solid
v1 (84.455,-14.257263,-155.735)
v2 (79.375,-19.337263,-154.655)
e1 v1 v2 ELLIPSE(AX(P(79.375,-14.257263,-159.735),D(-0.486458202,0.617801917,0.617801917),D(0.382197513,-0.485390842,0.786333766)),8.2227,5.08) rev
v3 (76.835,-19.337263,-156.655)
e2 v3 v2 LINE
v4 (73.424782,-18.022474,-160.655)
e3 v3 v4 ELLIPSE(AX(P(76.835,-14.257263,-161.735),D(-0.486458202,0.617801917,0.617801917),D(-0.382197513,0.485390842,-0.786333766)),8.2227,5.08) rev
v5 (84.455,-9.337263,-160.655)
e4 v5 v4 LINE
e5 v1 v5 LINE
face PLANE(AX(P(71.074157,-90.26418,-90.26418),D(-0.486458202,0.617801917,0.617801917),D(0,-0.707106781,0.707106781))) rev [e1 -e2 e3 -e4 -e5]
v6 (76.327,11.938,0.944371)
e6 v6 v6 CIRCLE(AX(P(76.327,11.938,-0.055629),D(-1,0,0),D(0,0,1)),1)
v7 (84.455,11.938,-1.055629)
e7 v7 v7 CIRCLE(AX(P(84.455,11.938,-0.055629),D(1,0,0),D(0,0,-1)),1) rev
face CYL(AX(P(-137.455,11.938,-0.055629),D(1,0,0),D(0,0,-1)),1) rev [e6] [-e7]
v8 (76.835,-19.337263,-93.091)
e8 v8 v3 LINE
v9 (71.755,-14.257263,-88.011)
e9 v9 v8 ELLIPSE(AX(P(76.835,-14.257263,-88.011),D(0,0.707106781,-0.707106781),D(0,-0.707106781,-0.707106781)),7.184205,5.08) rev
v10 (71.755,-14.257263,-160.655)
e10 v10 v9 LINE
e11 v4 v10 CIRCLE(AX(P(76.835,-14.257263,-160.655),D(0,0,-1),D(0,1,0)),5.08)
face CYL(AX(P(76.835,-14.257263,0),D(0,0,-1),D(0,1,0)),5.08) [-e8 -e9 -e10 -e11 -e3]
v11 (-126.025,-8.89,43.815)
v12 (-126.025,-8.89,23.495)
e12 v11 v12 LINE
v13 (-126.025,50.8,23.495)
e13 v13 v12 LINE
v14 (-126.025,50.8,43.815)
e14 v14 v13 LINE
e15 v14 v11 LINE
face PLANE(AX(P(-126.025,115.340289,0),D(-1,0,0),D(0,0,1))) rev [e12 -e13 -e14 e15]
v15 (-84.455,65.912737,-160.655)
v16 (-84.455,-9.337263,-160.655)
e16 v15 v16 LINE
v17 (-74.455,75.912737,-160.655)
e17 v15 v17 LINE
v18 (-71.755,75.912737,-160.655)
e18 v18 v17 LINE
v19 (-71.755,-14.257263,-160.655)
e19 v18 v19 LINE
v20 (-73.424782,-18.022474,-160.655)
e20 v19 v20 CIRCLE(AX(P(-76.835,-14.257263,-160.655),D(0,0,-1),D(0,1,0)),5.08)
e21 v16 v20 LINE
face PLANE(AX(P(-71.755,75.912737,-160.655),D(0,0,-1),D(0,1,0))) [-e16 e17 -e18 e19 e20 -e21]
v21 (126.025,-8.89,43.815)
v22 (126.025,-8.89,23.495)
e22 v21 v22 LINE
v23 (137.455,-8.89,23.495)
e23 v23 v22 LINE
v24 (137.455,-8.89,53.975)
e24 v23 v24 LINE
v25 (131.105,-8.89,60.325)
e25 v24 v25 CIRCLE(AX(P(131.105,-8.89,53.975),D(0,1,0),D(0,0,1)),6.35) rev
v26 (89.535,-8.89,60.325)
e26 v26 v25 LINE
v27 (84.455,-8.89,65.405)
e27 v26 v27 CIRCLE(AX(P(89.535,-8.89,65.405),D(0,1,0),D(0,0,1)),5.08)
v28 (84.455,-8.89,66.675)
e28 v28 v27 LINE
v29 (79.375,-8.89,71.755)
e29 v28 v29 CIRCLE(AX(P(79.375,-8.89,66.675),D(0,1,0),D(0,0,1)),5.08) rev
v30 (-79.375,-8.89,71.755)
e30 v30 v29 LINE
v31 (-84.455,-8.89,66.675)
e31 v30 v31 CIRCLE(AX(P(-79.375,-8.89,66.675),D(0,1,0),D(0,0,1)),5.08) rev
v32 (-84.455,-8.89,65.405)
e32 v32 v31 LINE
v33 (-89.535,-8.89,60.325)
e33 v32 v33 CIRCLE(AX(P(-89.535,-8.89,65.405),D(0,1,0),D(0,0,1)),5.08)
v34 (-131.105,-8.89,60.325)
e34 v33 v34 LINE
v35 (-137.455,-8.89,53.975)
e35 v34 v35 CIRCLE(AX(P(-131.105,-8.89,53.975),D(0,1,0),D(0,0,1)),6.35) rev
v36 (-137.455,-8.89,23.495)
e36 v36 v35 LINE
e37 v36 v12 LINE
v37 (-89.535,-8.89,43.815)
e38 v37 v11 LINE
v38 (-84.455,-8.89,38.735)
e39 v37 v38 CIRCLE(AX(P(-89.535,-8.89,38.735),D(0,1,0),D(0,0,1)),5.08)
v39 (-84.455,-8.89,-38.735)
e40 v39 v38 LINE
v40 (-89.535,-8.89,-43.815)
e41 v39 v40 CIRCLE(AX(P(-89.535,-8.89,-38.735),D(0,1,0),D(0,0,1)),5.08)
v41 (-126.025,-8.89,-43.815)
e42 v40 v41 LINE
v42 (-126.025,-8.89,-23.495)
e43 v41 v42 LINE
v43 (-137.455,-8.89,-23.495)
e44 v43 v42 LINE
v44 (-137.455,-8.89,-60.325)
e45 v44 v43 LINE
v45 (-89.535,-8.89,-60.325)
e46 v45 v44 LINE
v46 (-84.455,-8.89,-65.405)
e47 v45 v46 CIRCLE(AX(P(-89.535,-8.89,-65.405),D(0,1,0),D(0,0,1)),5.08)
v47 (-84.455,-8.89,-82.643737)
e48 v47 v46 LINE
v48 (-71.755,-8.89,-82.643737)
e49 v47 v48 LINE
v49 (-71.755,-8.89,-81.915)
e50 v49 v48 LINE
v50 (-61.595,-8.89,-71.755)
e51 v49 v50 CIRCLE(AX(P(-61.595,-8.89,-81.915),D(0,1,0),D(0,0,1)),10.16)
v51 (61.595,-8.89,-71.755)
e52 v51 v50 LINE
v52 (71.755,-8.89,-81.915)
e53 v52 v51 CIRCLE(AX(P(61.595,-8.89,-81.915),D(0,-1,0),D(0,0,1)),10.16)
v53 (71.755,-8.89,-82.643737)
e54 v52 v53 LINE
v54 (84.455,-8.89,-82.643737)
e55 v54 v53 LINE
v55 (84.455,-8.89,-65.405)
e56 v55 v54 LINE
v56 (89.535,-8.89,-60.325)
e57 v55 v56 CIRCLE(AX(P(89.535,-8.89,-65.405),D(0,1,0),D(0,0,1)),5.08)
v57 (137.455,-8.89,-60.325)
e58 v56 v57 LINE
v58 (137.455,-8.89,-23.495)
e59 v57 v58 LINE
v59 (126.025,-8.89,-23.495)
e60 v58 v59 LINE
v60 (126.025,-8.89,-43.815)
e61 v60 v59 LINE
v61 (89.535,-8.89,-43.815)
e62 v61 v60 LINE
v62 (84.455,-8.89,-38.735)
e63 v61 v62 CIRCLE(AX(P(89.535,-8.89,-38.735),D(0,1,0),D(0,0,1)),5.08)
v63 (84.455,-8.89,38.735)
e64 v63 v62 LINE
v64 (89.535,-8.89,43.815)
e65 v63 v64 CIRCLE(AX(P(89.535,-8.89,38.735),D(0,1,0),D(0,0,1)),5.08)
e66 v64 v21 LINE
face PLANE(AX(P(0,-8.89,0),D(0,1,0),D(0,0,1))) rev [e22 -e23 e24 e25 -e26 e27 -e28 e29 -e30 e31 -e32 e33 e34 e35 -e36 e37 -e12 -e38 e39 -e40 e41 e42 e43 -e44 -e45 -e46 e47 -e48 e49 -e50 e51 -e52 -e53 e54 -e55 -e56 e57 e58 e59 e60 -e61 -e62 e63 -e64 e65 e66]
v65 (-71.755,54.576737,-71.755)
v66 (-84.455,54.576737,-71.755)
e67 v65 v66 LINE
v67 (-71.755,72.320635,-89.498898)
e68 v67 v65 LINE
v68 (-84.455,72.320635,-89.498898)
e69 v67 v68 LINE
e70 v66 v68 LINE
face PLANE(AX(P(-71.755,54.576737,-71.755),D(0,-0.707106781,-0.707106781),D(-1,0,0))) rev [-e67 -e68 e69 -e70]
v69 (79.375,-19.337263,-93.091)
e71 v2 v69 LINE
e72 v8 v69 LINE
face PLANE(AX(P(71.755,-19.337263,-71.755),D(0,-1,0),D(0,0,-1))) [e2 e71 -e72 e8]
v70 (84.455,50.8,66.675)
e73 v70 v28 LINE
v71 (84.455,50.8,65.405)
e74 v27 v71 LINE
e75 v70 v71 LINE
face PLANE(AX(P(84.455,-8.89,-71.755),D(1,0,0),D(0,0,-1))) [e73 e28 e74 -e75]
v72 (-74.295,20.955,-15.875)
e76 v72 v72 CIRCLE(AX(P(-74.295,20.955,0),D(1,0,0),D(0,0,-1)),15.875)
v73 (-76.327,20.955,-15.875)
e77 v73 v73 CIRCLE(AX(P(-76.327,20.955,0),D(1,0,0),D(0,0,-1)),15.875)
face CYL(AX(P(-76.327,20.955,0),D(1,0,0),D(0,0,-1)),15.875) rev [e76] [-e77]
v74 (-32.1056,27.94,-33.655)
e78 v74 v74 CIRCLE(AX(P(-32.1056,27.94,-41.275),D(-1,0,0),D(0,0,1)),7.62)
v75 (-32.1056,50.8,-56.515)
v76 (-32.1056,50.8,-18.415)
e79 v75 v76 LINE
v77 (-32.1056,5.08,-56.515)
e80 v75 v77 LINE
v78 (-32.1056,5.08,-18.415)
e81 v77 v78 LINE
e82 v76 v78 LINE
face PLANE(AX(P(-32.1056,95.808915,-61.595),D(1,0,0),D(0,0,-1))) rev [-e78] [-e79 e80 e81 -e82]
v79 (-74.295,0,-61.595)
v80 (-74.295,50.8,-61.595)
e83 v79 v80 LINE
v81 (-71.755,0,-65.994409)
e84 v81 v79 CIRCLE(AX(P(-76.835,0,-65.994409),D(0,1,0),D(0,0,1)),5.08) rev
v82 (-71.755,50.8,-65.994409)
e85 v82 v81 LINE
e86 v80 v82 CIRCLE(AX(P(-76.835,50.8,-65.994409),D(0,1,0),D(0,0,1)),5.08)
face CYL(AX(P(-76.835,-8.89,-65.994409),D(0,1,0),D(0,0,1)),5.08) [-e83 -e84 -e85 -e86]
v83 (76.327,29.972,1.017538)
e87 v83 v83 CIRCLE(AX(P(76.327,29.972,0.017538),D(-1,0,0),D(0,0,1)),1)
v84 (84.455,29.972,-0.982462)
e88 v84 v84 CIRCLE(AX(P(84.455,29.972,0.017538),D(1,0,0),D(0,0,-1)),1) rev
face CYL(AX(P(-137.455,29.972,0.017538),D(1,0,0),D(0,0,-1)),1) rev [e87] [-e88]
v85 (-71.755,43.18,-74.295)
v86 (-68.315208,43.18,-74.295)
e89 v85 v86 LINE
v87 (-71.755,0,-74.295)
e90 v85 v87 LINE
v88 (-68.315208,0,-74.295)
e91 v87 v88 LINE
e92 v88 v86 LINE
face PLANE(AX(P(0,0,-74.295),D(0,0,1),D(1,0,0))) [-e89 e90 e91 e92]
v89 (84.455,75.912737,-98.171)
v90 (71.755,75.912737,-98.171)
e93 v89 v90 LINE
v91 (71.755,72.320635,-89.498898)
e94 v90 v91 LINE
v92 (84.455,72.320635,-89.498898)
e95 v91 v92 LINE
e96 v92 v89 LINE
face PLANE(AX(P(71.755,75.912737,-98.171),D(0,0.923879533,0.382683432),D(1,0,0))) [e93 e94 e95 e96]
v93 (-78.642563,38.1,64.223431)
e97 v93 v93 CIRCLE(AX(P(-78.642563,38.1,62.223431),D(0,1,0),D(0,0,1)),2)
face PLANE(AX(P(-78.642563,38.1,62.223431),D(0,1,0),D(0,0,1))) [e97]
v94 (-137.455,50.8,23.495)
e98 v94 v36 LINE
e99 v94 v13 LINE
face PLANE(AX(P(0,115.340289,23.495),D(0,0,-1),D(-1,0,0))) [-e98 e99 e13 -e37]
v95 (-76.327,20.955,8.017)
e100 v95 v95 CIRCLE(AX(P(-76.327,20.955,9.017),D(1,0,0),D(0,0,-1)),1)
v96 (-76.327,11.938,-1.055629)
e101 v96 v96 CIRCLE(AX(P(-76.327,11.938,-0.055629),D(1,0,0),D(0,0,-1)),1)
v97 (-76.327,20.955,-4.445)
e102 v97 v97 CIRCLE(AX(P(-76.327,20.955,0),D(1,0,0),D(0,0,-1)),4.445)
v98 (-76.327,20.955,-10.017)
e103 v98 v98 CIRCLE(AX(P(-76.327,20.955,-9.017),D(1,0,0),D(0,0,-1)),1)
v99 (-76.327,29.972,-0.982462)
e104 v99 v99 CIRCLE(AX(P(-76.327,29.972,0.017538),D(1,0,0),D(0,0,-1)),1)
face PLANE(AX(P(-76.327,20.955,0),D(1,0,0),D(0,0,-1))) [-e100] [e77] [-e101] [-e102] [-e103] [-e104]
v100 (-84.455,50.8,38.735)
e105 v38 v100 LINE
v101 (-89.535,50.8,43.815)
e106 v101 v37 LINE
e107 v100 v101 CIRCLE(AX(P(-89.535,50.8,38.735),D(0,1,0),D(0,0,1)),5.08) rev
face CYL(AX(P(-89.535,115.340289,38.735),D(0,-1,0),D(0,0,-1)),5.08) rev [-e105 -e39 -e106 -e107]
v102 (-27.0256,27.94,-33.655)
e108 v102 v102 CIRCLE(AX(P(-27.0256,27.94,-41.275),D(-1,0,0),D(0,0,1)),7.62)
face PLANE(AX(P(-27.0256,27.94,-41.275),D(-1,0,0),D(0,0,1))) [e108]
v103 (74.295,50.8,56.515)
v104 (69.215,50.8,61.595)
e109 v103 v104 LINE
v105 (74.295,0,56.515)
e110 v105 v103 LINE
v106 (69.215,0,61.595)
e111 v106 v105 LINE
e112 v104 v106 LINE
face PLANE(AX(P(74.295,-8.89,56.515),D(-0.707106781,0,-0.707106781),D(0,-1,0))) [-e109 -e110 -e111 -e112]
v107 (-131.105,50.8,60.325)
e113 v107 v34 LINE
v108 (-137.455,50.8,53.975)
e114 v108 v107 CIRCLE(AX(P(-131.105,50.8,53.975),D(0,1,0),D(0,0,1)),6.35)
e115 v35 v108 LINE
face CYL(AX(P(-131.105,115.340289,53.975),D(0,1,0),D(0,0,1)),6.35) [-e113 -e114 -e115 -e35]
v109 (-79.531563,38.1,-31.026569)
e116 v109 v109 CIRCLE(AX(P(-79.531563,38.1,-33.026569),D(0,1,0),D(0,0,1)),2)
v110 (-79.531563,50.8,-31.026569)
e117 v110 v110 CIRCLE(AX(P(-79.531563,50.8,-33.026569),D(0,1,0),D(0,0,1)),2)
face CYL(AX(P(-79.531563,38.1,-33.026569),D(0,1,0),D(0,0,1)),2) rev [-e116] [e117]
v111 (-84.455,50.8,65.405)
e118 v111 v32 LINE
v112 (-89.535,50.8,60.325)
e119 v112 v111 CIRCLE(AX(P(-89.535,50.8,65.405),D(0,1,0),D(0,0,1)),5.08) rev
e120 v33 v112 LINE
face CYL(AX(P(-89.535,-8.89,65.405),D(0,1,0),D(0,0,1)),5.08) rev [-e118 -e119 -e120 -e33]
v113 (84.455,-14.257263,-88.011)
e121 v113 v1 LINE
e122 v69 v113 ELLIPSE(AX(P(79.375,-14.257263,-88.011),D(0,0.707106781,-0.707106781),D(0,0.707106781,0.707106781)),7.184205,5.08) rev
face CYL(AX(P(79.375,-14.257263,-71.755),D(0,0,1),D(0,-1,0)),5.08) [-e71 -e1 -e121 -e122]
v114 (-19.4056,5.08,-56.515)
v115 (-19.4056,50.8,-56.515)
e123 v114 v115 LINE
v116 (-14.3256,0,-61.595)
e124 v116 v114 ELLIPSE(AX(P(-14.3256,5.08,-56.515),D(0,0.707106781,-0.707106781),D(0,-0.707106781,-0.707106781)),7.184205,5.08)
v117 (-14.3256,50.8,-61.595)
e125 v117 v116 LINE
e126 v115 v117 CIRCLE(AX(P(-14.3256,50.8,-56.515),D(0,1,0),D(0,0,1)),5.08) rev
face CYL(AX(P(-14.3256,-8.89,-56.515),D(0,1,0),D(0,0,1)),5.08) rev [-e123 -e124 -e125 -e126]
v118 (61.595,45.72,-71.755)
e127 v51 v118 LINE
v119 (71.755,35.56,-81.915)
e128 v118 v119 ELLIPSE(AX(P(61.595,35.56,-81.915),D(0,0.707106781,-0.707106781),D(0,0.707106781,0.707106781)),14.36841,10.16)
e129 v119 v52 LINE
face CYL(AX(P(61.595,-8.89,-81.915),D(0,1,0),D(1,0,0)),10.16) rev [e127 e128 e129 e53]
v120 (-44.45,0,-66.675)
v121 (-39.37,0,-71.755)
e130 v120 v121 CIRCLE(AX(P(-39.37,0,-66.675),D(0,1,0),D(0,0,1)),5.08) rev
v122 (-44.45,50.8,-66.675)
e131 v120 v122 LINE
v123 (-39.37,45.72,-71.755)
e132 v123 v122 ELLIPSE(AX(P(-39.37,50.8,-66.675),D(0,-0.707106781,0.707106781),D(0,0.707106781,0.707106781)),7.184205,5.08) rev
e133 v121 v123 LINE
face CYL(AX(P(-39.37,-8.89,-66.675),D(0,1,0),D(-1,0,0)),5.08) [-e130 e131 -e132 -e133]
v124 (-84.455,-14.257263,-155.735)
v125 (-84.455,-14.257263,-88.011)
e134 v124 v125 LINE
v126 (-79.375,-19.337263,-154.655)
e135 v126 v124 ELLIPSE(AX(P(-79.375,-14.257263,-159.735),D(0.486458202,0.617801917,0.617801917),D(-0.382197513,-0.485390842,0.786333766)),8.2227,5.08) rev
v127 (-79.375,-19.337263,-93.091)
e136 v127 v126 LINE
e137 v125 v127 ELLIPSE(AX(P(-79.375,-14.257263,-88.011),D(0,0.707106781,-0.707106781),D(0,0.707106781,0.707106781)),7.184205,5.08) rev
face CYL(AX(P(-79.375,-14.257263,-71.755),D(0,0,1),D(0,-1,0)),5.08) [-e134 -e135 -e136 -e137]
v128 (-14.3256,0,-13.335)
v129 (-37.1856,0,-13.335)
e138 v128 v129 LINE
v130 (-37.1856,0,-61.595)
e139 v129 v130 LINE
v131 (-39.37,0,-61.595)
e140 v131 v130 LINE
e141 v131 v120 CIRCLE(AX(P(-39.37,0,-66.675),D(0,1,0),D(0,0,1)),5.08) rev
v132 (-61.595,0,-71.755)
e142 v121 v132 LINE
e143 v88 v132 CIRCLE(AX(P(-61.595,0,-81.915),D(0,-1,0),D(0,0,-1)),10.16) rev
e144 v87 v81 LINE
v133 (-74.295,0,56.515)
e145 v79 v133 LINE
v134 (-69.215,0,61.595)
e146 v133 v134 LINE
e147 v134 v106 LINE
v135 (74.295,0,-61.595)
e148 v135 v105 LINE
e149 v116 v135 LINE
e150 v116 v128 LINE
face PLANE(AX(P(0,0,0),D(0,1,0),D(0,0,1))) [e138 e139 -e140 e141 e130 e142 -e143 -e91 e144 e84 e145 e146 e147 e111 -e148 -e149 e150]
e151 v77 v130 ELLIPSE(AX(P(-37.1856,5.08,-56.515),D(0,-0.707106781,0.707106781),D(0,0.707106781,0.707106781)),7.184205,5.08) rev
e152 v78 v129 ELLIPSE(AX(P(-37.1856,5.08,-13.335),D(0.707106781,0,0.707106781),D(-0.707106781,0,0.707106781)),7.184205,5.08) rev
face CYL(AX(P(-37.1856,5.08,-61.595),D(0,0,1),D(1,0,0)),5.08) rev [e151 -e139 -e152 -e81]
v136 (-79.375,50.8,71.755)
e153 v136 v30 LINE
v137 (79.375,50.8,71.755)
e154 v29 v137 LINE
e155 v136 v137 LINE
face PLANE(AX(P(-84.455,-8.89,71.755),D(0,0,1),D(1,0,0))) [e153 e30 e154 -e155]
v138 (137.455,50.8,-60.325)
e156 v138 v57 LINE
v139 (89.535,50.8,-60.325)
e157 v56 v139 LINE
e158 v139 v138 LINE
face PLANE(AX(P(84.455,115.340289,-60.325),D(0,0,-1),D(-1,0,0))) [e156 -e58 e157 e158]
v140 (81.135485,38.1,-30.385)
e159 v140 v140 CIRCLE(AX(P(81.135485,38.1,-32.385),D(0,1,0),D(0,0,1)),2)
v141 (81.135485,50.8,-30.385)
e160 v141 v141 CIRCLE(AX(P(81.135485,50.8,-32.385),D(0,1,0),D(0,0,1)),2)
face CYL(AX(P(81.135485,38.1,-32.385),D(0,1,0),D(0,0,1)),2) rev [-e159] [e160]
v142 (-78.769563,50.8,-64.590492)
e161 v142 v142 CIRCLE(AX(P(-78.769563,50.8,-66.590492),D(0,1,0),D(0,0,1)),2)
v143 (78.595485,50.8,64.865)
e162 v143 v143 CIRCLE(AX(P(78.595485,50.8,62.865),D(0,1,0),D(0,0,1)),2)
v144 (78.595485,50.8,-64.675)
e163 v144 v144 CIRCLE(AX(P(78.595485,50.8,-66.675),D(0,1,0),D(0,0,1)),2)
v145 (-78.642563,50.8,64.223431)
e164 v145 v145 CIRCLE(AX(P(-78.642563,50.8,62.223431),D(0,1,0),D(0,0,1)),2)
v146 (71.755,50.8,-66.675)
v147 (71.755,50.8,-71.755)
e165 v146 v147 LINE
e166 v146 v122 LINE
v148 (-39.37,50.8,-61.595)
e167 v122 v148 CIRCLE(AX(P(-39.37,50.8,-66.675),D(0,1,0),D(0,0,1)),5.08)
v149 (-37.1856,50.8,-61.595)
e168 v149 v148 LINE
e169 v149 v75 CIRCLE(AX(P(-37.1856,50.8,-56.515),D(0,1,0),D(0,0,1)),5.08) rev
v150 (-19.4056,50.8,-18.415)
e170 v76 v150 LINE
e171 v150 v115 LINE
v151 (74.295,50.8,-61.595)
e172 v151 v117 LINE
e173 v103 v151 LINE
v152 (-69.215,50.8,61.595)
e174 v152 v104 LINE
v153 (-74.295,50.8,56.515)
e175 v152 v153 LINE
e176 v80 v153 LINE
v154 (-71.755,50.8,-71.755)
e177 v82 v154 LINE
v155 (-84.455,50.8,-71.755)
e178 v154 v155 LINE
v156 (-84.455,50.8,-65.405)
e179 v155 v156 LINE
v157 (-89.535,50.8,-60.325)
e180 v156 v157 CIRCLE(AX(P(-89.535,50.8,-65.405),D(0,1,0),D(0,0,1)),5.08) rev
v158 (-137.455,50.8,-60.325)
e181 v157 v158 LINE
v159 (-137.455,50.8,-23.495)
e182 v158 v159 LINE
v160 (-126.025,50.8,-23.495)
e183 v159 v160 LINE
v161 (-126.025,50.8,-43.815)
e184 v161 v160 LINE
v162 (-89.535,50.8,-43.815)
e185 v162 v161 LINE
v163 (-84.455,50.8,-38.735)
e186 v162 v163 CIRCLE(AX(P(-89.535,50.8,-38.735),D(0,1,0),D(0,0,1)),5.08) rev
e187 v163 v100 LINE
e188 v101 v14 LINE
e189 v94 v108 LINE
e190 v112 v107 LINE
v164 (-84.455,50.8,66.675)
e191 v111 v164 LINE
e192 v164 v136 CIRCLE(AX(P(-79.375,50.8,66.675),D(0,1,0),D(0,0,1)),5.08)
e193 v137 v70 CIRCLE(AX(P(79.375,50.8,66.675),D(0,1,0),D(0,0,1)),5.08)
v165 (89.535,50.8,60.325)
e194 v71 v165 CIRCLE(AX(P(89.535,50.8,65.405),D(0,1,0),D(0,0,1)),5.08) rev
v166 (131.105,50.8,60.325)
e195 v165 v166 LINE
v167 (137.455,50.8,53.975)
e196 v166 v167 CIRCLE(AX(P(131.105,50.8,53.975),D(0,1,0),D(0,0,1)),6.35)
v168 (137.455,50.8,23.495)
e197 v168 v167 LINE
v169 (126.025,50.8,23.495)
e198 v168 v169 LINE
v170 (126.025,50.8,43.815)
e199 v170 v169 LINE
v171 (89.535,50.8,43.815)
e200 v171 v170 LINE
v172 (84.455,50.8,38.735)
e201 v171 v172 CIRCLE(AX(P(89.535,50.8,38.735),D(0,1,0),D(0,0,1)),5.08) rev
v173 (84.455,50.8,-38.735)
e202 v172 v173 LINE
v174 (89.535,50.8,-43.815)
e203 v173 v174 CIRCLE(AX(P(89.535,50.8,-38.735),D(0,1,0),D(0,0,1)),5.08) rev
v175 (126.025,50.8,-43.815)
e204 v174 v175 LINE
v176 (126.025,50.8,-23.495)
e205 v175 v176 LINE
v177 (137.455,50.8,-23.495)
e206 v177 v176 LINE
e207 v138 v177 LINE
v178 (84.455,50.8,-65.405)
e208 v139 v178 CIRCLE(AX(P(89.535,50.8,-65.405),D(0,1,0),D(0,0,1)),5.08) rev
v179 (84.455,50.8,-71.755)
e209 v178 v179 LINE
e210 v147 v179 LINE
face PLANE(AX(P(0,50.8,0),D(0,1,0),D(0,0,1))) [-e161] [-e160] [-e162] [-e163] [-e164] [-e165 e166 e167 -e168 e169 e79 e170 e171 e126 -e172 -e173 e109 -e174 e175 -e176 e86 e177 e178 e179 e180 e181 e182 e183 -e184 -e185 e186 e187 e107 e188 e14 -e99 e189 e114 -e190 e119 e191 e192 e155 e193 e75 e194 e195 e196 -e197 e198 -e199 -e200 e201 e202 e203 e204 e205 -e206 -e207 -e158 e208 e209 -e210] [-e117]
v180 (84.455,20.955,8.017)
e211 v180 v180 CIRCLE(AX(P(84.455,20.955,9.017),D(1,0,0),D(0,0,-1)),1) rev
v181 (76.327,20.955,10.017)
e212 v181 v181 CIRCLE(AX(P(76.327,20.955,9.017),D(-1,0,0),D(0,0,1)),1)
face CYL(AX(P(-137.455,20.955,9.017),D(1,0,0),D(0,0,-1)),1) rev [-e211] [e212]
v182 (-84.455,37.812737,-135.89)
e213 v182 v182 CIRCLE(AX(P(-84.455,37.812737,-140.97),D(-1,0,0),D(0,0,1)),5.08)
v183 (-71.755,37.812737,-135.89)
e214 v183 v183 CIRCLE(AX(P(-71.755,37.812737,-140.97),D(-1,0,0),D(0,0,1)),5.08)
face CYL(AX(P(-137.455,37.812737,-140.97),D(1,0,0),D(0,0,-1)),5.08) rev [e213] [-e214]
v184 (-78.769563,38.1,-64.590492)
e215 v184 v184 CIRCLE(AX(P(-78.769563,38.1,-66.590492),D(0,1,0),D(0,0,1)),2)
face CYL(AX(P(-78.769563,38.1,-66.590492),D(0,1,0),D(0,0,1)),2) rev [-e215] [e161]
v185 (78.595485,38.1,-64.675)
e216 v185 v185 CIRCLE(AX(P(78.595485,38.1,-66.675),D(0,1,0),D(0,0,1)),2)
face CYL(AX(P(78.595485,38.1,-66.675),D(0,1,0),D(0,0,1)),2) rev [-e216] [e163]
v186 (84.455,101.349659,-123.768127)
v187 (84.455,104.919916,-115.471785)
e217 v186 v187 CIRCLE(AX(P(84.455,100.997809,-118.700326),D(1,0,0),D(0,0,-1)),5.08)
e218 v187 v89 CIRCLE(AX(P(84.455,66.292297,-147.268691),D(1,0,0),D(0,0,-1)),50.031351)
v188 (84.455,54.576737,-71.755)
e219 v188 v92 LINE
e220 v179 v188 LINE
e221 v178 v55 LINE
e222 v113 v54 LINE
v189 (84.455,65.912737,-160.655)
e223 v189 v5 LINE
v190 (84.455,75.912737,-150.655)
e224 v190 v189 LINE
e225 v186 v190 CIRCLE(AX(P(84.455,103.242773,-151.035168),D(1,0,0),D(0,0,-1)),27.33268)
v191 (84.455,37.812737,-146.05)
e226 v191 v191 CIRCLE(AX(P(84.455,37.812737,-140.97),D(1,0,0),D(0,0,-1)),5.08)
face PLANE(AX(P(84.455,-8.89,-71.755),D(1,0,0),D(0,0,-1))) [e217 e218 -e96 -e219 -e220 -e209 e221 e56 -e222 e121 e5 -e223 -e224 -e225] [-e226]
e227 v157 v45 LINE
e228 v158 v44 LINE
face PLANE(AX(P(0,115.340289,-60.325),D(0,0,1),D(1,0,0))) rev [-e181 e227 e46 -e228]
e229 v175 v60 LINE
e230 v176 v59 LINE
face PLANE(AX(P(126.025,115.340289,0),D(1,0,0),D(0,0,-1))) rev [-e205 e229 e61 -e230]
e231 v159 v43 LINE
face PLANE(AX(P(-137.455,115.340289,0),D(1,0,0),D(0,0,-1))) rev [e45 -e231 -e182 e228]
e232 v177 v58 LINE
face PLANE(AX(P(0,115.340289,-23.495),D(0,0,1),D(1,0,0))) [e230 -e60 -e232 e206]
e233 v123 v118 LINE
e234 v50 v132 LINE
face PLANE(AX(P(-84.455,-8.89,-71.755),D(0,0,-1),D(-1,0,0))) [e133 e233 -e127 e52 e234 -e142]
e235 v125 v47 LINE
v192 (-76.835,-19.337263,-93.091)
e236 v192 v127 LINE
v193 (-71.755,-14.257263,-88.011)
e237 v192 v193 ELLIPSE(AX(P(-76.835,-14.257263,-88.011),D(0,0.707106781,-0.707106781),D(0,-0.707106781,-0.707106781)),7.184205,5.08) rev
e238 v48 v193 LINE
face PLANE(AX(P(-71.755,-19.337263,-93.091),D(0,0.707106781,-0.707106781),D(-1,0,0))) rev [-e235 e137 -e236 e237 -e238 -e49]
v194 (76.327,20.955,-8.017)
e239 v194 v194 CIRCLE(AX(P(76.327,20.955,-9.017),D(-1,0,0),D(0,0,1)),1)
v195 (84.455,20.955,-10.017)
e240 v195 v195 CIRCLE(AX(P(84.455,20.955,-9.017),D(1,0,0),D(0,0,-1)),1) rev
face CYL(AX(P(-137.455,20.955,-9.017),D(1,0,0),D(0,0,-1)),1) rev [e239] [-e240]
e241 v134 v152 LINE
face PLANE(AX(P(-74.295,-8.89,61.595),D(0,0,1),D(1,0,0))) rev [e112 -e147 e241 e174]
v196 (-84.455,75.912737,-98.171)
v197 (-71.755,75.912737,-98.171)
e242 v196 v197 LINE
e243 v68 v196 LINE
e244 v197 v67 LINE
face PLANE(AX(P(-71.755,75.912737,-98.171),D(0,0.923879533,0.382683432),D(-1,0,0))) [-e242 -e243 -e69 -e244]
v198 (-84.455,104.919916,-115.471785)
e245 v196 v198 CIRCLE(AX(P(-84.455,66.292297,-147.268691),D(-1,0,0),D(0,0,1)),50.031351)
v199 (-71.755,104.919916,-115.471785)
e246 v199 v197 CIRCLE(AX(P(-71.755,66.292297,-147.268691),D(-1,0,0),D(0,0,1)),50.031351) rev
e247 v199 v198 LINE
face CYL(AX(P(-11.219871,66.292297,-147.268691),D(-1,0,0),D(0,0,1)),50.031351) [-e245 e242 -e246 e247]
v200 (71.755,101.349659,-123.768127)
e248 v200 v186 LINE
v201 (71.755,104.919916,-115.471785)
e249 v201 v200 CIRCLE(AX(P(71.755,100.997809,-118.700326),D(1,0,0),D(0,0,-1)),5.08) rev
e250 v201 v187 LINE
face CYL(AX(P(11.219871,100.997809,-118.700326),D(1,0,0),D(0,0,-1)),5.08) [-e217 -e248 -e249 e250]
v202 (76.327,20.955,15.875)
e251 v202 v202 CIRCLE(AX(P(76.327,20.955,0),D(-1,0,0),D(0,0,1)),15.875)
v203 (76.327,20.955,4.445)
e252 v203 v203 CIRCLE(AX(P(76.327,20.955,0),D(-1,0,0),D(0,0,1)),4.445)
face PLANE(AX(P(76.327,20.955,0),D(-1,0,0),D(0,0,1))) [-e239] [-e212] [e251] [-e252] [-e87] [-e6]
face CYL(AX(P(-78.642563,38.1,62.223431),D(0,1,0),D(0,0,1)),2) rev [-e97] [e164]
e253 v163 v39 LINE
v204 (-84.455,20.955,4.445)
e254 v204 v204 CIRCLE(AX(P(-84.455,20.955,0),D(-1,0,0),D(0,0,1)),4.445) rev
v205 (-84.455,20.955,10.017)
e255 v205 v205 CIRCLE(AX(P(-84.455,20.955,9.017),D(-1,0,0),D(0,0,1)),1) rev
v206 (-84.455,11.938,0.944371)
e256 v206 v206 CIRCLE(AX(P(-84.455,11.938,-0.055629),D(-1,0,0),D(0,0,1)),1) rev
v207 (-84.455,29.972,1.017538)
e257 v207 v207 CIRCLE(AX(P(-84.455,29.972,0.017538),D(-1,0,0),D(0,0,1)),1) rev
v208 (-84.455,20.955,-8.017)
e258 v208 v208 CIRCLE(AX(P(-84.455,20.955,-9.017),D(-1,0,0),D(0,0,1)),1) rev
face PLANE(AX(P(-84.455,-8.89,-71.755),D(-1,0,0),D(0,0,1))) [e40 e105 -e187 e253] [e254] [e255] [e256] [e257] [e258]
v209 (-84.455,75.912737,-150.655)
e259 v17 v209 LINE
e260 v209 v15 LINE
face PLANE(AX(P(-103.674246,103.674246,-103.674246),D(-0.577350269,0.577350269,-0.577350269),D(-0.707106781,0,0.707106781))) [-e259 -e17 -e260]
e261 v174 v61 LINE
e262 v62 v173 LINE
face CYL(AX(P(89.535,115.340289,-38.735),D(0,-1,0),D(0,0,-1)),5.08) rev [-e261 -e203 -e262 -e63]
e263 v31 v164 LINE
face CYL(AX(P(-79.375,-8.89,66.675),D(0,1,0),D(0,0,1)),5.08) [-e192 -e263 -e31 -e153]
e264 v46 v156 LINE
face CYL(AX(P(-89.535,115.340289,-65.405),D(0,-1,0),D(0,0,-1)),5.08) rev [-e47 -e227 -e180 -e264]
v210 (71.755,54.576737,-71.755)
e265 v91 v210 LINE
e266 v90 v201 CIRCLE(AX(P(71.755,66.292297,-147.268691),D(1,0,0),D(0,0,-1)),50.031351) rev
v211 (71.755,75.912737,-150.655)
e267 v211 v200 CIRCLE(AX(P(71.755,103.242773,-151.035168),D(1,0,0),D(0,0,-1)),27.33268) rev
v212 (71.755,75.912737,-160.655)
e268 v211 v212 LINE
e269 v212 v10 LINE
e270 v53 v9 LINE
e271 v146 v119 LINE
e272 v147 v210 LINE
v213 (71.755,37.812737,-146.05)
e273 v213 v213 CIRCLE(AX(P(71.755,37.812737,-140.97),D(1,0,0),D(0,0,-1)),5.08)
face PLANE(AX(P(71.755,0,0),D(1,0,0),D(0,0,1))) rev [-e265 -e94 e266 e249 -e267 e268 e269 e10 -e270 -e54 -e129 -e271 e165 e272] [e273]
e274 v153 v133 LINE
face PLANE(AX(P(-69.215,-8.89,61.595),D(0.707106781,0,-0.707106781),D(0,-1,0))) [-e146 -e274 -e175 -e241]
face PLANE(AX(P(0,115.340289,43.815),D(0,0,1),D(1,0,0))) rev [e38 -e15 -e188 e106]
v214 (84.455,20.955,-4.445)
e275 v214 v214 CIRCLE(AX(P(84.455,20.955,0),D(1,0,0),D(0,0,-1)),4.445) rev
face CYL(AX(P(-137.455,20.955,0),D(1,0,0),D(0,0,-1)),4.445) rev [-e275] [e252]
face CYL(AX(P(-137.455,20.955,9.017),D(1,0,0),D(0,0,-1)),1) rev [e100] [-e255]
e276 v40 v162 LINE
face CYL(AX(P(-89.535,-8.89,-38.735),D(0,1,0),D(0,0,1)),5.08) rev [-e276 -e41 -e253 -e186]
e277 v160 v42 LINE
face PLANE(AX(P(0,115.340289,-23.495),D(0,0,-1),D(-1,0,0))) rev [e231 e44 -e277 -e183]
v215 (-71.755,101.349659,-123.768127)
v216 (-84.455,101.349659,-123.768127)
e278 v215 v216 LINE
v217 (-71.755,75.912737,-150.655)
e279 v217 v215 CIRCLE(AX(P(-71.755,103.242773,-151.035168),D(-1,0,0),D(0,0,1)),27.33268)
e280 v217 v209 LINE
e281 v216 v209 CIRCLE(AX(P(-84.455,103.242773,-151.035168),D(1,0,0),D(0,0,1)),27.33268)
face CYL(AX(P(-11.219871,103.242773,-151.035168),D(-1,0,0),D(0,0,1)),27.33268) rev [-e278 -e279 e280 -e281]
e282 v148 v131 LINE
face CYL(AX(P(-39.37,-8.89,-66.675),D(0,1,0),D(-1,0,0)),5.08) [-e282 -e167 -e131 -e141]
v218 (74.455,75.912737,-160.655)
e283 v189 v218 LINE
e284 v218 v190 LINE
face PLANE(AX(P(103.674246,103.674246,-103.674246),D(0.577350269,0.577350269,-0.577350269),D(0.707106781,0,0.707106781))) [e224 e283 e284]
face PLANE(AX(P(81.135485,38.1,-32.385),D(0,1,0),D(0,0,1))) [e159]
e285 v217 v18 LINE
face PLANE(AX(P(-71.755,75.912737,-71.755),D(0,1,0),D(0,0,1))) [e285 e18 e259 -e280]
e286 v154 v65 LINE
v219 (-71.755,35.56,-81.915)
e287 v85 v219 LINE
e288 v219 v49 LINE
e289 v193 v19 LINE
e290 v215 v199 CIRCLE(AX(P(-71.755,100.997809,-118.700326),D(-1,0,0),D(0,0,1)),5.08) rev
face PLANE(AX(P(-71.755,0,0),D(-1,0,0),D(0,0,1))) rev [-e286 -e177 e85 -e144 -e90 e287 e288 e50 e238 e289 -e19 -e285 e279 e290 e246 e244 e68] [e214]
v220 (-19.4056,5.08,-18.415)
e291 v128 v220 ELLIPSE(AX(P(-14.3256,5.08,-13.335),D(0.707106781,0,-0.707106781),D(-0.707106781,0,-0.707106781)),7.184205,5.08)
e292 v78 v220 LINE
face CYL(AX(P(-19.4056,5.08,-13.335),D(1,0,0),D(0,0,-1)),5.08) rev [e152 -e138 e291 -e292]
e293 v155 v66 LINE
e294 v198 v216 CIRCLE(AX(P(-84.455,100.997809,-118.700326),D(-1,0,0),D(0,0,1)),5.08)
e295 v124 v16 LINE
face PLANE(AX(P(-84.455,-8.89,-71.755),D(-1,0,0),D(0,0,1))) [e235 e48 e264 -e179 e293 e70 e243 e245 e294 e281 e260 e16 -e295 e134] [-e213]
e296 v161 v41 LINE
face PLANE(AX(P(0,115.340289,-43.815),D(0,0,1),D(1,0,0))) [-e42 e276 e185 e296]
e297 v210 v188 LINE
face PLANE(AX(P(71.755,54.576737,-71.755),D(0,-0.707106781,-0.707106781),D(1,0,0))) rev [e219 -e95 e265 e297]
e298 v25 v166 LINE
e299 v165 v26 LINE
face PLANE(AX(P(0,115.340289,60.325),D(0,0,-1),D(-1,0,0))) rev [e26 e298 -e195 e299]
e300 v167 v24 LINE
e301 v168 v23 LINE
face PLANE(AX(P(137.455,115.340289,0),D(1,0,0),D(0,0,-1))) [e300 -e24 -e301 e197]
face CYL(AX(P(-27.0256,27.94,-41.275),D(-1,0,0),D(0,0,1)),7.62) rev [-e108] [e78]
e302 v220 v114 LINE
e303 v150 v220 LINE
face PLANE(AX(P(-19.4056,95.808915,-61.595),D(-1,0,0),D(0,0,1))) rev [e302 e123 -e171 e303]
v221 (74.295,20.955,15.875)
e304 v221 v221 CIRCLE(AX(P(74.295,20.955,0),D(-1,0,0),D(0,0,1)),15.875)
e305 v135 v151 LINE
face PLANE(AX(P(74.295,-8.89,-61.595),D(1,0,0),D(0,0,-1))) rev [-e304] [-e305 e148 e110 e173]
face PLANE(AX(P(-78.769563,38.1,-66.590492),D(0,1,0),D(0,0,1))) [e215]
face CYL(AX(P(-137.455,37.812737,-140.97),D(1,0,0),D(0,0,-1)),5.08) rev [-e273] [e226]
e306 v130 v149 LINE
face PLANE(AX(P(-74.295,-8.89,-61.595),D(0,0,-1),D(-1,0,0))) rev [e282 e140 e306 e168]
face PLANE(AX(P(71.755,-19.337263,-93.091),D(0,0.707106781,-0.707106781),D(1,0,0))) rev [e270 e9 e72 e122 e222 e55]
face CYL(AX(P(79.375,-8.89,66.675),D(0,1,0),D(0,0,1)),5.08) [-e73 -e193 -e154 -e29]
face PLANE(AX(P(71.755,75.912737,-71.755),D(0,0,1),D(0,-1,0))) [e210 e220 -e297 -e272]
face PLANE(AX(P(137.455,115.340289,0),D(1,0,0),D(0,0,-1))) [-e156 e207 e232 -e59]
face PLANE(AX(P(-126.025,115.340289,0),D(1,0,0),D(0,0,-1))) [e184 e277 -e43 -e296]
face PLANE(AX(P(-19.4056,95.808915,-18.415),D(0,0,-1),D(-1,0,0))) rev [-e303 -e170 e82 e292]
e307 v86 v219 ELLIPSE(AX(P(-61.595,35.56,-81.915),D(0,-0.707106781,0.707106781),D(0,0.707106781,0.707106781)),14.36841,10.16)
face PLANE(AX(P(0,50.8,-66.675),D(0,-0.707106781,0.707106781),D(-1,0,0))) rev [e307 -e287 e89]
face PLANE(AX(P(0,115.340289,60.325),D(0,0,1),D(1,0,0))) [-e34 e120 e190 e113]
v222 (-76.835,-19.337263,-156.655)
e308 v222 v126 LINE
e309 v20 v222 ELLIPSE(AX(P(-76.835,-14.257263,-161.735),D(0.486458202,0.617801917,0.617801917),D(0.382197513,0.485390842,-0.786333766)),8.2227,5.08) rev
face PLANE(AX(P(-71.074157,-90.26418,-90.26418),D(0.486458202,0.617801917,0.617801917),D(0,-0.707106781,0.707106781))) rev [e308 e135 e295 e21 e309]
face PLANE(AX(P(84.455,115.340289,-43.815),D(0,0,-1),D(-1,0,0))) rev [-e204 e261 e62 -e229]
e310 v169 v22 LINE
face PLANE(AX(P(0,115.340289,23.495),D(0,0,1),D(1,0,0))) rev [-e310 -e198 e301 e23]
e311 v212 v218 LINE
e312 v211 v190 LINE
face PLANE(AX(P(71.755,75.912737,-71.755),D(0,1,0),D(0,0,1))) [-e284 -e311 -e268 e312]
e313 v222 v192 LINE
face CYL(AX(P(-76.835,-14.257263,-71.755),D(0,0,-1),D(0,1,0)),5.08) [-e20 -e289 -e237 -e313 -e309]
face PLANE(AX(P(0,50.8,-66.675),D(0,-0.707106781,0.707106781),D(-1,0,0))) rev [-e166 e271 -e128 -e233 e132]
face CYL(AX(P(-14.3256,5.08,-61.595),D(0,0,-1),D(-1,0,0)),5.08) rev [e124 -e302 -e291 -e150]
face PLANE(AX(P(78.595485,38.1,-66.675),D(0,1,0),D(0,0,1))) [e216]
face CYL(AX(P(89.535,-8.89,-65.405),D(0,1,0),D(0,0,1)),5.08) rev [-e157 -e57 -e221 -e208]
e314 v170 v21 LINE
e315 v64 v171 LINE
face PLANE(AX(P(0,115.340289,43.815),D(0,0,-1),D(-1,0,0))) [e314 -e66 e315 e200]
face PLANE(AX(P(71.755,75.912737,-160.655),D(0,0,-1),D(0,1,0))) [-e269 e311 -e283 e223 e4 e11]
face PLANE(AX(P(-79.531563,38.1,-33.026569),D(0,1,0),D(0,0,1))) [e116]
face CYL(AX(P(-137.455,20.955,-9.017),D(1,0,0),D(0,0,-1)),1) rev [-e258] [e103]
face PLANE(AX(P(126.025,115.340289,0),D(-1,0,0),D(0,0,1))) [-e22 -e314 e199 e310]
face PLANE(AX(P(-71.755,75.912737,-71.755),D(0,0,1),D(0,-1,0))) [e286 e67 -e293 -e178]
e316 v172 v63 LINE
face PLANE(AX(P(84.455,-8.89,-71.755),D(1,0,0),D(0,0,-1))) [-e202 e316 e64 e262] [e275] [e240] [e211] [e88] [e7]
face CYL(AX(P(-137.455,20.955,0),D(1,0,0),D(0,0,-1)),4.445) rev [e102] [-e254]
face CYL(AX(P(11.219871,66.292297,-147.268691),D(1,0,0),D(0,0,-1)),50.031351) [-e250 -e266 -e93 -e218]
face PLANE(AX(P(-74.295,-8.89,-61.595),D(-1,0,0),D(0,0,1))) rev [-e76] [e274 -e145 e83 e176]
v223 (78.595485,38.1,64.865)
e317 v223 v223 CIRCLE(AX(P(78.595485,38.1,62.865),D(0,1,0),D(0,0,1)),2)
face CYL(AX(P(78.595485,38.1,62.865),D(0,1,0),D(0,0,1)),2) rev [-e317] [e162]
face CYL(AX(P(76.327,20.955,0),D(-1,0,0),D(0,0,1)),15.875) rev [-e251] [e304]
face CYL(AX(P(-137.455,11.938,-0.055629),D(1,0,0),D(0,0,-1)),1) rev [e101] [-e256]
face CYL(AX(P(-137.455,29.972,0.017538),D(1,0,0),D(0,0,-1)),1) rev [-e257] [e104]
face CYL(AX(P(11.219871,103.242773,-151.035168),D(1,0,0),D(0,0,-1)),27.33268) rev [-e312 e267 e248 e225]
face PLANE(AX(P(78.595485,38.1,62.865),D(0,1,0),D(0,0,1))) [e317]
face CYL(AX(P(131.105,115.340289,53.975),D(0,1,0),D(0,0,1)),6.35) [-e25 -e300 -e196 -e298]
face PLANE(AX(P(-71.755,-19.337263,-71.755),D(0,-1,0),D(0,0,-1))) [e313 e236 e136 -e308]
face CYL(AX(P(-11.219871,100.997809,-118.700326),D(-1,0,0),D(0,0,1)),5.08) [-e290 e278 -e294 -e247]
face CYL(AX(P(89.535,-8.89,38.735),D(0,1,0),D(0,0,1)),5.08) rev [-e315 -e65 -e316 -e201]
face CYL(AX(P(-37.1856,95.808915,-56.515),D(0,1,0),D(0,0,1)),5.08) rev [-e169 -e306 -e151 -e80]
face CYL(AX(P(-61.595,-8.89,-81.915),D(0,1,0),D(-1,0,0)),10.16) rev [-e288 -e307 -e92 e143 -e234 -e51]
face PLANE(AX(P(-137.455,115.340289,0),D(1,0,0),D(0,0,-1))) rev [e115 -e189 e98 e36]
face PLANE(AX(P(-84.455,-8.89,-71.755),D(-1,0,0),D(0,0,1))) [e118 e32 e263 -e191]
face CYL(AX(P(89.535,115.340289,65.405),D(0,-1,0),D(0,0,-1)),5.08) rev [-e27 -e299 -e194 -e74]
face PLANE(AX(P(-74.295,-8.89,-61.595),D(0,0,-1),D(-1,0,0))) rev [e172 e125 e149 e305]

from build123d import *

# Parameters (mm, degrees)
BOSS_EXTRUDE1_DEPTH      = 50.8
BOSS_EXTRUDE1_DEPTH_BACK = 8.89
SKETCH3_W                = 168.91
SKETCH3_H                = 143.51
SKETCH3_W_2              = 148.59
SKETCH3_H_2              = 123.19
SKETCH3_3_W              = 148.59
SKETCH3_3_H              = 123.19
BOSS_EXTRUDE2_DEPTH      = 8.89
BOSS_EXTRUDE3_DEPTH      = 59.69
CUT_EXTRUDE1_DEPTH       = 239.691156361
CUT_EXTRUDE1_DEPTH_BACK  = 239.691156361
SKETCH5_R                = 4.445
SKETCH5_R_2              = 1.000000032
SKETCH5_R_3              = 1
FILLET1_R                = 5.08
SKETCH7_W                = 88.9
SKETCH7_H                = 95.25
BOSS_EXTRUDE4_DEPTH      = 12.7
CHAMFER1_SIZE            = 21.336
CHAMFER2_START           = -153
CHAMFER2_OUTLINE_W       = 18
CHAMFER2_OUTLINE_H       = 17
CHAMFER2_DEPTH           = 6.894626535
CHAMFER3_START           = -186
CHAMFER3_OUTLINE_W       = 15
CHAMFER3_OUTLINE_H       = 17
CHAMFER3_DEPTH           = 6.430939091
CHAMFER4_SIZE            = 5.08
CHAMFER5_SIZE            = 5.08
FILLET3_R                = 10.16
CHAMFER6_SIZE            = 5.08
CUT_EXTRUDE2_DEPTH       = 275.484237722
CUT_EXTRUDE2_DEPTH_BACK  = 275.484237722
SKETCH8_R                = 5.08
SKETCH9_R                = 2
SKETCH9_R_2              = 2.000000064
CUT_EXTRUDE3_DEPTH       = 12.7
SKETCH10_W               = 12.7
SKETCH10_H               = 43.18
BOSS_EXTRUDE5_DEPTH      = 50.8
SKETCH11_W               = 27.305
SKETCH11_H               = 50.8
CUT_EXTRUDE4_DEPTH       = 12.7
FILLET4_R                = 5.08
SKETCH12_R               = 15.875
CUT_EXTRUDE5_DEPTH       = 2.032
CUT_EXTRUDE6_START       = -2.032
SKETCH13_R               = 15.875
CUT_EXTRUDE6_DEPTH       = 2.032
FILLET5_R                = 5.08
FILLET6_R                = 5.08
SKETCH15_R               = 7.62
CUT_EXTRUDE7_DEPTH       = 5.08
BOSS_EXTRUDE6_DEPTH      = 12.7
FILLET9_R                = 6.35
BOSS_EXTRUDE7_START      = -12.7
BOSS_EXTRUDE7_DEPTH      = 12.7


with BuildPart() as part:
    # Sketch3 → Boss-Extrude1 (new, two sides: drawn at the far end of the back side and taken through both)
    with BuildSketch(Plane(origin=(0, 0, 0), x_dir=(1, 0, 0), z_dir=(0, 1, 0)).offset(-BOSS_EXTRUDE1_DEPTH_BACK)):
        Rectangle(SKETCH3_W, SKETCH3_H)
        Rectangle(SKETCH3_W_2, SKETCH3_H_2, mode=Mode.SUBTRACT)
    extrude(amount=BOSS_EXTRUDE1_DEPTH + BOSS_EXTRUDE1_DEPTH_BACK)

    # Sketch3<3> → Boss-Extrude2 (add)
    with BuildSketch(Plane(origin=(0, 0, 0), x_dir=(1, 0, 0), z_dir=(0, 1, 0))):
        Rectangle(SKETCH3_3_W, SKETCH3_3_H)
    extrude(amount=-BOSS_EXTRUDE2_DEPTH)

    # Sketch4 → Boss-Extrude3 (add)
    with BuildSketch(Plane(origin=(0, -8.89, 0), x_dir=(-1, 0, 0), z_dir=(0, -1, 0))):
        Polygon((137.454999918, 60.325), (84.455, 60.325), (84.455, 43.815), (126.024999918, 43.815), (126.024999918, 23.495), (137.454999918, 23.495), align=None)
        Polygon((126.025, -43.815), (84.455, -43.815), (84.455, -60.325), (137.455, -60.325), (137.455, -23.495), (126.025, -23.495), align=None)
        Polygon((-84.455, 43.815), (-84.455, 60.325), (-137.454999918, 60.325), (-137.454999918, 23.495), (-126.024999918, 23.495), (-126.024999918, 43.815), align=None)
        Polygon((-84.455, -43.815), (-126.025, -43.815), (-126.025, -23.495), (-137.455, -23.495), (-137.455, -60.325), (-84.455, -60.325), align=None)
    extrude(amount=-BOSS_EXTRUDE3_DEPTH)

    # Sketch5 → Cut-Extrude1 (cut, two sides: drawn at the far end of the back side and taken through both)
    with BuildSketch(Plane.ZY.offset(84.455).offset(-CUT_EXTRUDE1_DEPTH_BACK)):
        with Locations(Location((0, 20.955, 0), (0, 0, 180))):
            Circle(SKETCH5_R)
        with Locations(Location((-9.017, 20.955, 0), (0, 0, 180))):
            Circle(SKETCH5_R_2)
        with Locations(Location((9.017, 20.955, 0), (0, 0, 180))):
            Circle(SKETCH5_R_3)
        with Locations(Location((0.017538483, 29.972, 0), (0, 0, 180))):
            Circle(SKETCH5_R_3)
        with Locations(Location((-0.055629344, 11.938, 0), (0, 0, 180))):
            Circle(SKETCH5_R_3)
    extrude(amount=CUT_EXTRUDE1_DEPTH + CUT_EXTRUDE1_DEPTH_BACK, mode=Mode.SUBTRACT)

    # Fillet1
    fillet1_edges = [part.edges().sort_by_distance(p)[0] for p in [
        (84.455, 20.955, -60.325),
        (84.455, 20.955, -43.815),
        (-84.455, 20.955, -43.815),
        (-84.455, 20.955, -60.325),
        (-84.455, 20.955, 43.815),
        (-84.455, 20.955, 60.325),
        (84.455, 20.955, 71.755),
        (-84.455, 20.955, 71.755),
        (84.455, 20.955, 60.325),
        (84.455, 20.955, 43.815),
    ]]
    fillet(fillet1_edges, radius=FILLET1_R)

    # Sketch7 → Boss-Extrude4 (add)
    with BuildSketch(Plane.ZY.offset(84.455)):
        with Locations((-116.205, 28.287736962)):
            Rectangle(SKETCH7_W, SKETCH7_H)
    extrude(amount=-BOSS_EXTRUDE4_DEPTH)

    # Chamfer1
    # the kernel refuses this chamfer: 21.336 mm, written as the material it takes off along each edge
    with BuildSketch(Plane(origin=(-139.324428231, 75.912736962, -71.755), x_dir=(0, -1, 0), z_dir=(1, 0, 0))) as chamfer1_piece_1:
        Polygon((CHAMFER1_SIZE, 0), (0, CHAMFER1_SIZE), (0, 0), align=None)
    extrude(amount=122.438856462, mode=Mode.SUBTRACT)
    with BuildSketch(Plane(origin=(-139.324428231, -19.337263038, -71.755), x_dir=(0, 1, 0), z_dir=(1, 0, 0))) as chamfer1_piece_2_section:
        Polygon((CHAMFER1_SIZE, 0), (0, -CHAMFER1_SIZE), (0, 0), align=None)
    chamfer1_piece_2 = extrude(amount=122.438856462, mode=Mode.PRIVATE)
    chamfer1_piece_2 = split(chamfer1_piece_2, bisect_by=Plane(origin=(-139.324428231, -8.89, -71.755), z_dir=(0, -1, 0)), keep=Keep.TOP, mode=Mode.PRIVATE)
    add(chamfer1_piece_2, mode=Mode.SUBTRACT)

    # Chamfer2: read off the stored shape, not the designer's step
    # Chamfer2 outline → Chamfer2 (cut)
    with BuildSketch(Plane(origin=(0, 0, 0), x_dir=(0.8737038499063027, -0.34397789366389886, -0.34397789366389886), z_dir=(0.4864582023760161, 0.6178019170175401, 0.6178019170175401)).offset(CHAMFER2_START)):
        with Locations((-8, 99.5)):
            Rectangle(CHAMFER2_OUTLINE_W, CHAMFER2_OUTLINE_H)
    extrude(amount=CHAMFER2_DEPTH, mode=Mode.SUBTRACT)

    # Chamfer3: read off the stored shape, not the designer's step
    # Chamfer3 outline → Chamfer3 (cut)
    with BuildSketch(Plane(origin=(0, 0, 0), x_dir=(0.8164965809277258, 0.40824829046386313, -0.40824829046386313), z_dir=(0.5773502691896258, -0.5773502691896258, 0.5773502691896258)).offset(CHAMFER3_START)):
        with Locations((29.5, -59.5)):
            Rectangle(CHAMFER3_OUTLINE_W, CHAMFER3_OUTLINE_H)
    extrude(amount=CHAMFER3_DEPTH, mode=Mode.SUBTRACT)

    # Chamfer4
    chamfer4_edges = [part.edges().sort_by_distance(p)[0] for p in [
        (-74.295, 25.4, 61.595),
        (74.295, 25.4, 61.595),
    ]]
    chamfer(chamfer4_edges, length=CHAMFER4_SIZE)

    # Chamfer5
    chamfer5_edges = [part.edges().sort_by_distance(p)[0] for p in [
        (6.35, 50.8, -71.755),
    ]]
    chamfer(chamfer5_edges, length=CHAMFER5_SIZE)

    # Fillet3
    fillet3_edges = [part.edges().sort_by_distance(p)[0] for p in [
        (-71.755, 18.415, -71.755),
    ]]
    fillet(fillet3_edges, radius=FILLET3_R)

    # Chamfer6
    chamfer6_edges = [part.edges().sort_by_distance(p)[0] for p in [
        (-78.105, 75.912736962, -93.091),
    ]]
    chamfer(chamfer6_edges, length=CHAMFER6_SIZE)

    # Mirror1: part across plane


with BuildPart() as part_1:
    add(part.part)
    add(part.part.mirror(Plane.ZY))

    # Sketch8 → Cut-Extrude2 (cut, two sides: drawn at the far end of the back side and taken through both)
    with BuildSketch(Plane(origin=(-71.755, 0, 0), x_dir=(0, 0, -1), z_dir=(1, 0, 0)).offset(-CUT_EXTRUDE2_DEPTH_BACK)):
        with Locations((140.97, 37.812736962)):
            Circle(SKETCH8_R)
    extrude(amount=CUT_EXTRUDE2_DEPTH + CUT_EXTRUDE2_DEPTH_BACK, mode=Mode.SUBTRACT)

    # Sketch9 → Cut-Extrude3 (cut)
    with BuildSketch(Plane(origin=(0, 50.8, 0), x_dir=(1, 0, 0), z_dir=(0, 1, 0))):
        with Locations(Location((-78.769563039, 66.590491676, 0), (0, 0, 270))):
            Circle(SKETCH9_R)
        with Locations(Location((-79.531563039, 33.026568856, 0), (0, 0, 270))):
            Circle(SKETCH9_R)
        with Locations(Location((-78.642563039, -62.223431144, 0), (0, 0, 270))):
            Circle(SKETCH9_R_2)
        with Locations(Location((78.595485178, -62.865, 0), (0, 0, 270))):
            Circle(SKETCH9_R)
        with Locations(Location((78.595485178, 66.675, 0), (0, 0, 270))):
            Circle(SKETCH9_R)
        with Locations(Location((81.135485178, 32.385, 0), (0, 0, 270))):
            Circle(SKETCH9_R)
    extrude(amount=-CUT_EXTRUDE3_DEPTH, mode=Mode.SUBTRACT)

    # Sketch10 → Boss-Extrude5 (add)
    with BuildSketch(Plane(origin=(0, 0, 0), x_dir=(1, 0, 0), z_dir=(0, 1, 0))):
        with Locations((-25.7556, 40.005)):
            Rectangle(SKETCH10_W, SKETCH10_H)
    extrude(amount=BOSS_EXTRUDE5_DEPTH)

    # Sketch11 → Cut-Extrude4 (cut)
    with BuildSketch(Plane.XY.offset(-61.595)):
        with Locations((-58.1025, 25.4)):
            Rectangle(SKETCH11_W, SKETCH11_H)
    extrude(amount=-CUT_EXTRUDE4_DEPTH, mode=Mode.SUBTRACT)

    # Fillet4
    # the kernel refuses this fillet: 5.08 mm, written as the material it takes off along each edge
    with BuildSketch(Plane(origin=(-44.45, 58.42, -71.755), x_dir=(1, 0, 0), z_dir=(0, -1, 0))) as fillet4_piece_1:
        with BuildLine():
            CenterArc((FILLET4_R, FILLET4_R), FILLET4_R, 180, 90)
            Line((0, FILLET4_R), (-FILLET4_R * 0.02, FILLET4_R))
            Line((-FILLET4_R * 0.02, FILLET4_R), (-FILLET4_R * 0.02, -FILLET4_R * 0.02))
            Line((-FILLET4_R * 0.02, -FILLET4_R * 0.02), (FILLET4_R, -FILLET4_R * 0.02))
            Line((FILLET4_R, -FILLET4_R * 0.02), (FILLET4_R, 0))
        make_face()
    extrude(amount=58.42, mode=Mode.SUBTRACT)
    with BuildSketch(Plane(origin=(-44.45, 0, -61.595), x_dir=(0, 0, -1), z_dir=(0, 1, 0))) as fillet4_piece_2:
        with BuildLine():
            CenterArc((FILLET4_R, -FILLET4_R), FILLET4_R, 90, 90)
            Line((0, -FILLET4_R), (-FILLET4_R * 0.02, -FILLET4_R))
            Line((-FILLET4_R * 0.02, -FILLET4_R), (-FILLET4_R * 0.02, FILLET4_R * 0.02))
            Line((-FILLET4_R * 0.02, FILLET4_R * 0.02), (FILLET4_R, FILLET4_R * 0.02))
            Line((FILLET4_R, FILLET4_R * 0.02), (FILLET4_R, 0))
        make_face()
    extrude(amount=63.5, mode=Mode.SUBTRACT)
    with BuildSketch(Plane(origin=(-71.755, 61.798522628, -61.595), x_dir=(0, 0, -1), z_dir=(0, -1, 0))) as fillet4_piece_3:
        with BuildLine():
            CenterArc((4.399409051, -5.08), FILLET4_R, 90, 60)
            Line((0, -2.54), (-0.087988181, -2.4892))
            ThreePointArc((-0.087988181, -2.4892), (-0.1016, -1.27), (-0.1016, 0))
            Line((-0.1016, 0), (0, 0.1016))
            Line((0, 0.1016), (4.399409051, 0.1016))
            Line((4.399409051, 0.1016), (4.399409051, 0))
        make_face()
    extrude(amount=61.798522628, mode=Mode.SUBTRACT)

    # Sketch12 → Cut-Extrude5 (cut)
    with BuildSketch(Plane(origin=(-74.295, 0, 0), x_dir=(0, 0, -1), z_dir=(1, 0, 0))):
        with Locations((0, 20.955)):
            Circle(SKETCH12_R)
    extrude(amount=-CUT_EXTRUDE5_DEPTH, mode=Mode.SUBTRACT)

    # Sketch13 → Cut-Extrude6 (cut)
    with BuildSketch(Plane.ZY.offset(-74.295).offset(CUT_EXTRUDE6_START)):
        with Locations(Location((0, 20.955, 0), (0, 0, 180))):
            Circle(SKETCH13_R)
    extrude(amount=CUT_EXTRUDE6_DEPTH, mode=Mode.SUBTRACT)

    # Fillet5
    fillet5_edges = [part_1.edges().sort_by_distance(p)[0] for p in [
        (-19.4056, 0, -40.005),
        (-19.4056, 25.4, -61.595),
        (-32.1056, 25.4, -61.595),
        (-32.1056, 0, -40.005),
        (-25.7556, 0, -18.415),
    ]]
    fillet(fillet5_edges, radius=FILLET5_R)

    # Fillet6
    fillet6_edges = [part_1.edges().sort_by_distance(p)[0] for p in [
        (-71.755, -19.337263038, -126.873),
        (-84.455, -19.337263038, -121.873),
        (84.455, -19.337263038, -121.873),
        (71.755, -19.337263038, -126.873),
    ]]
    fillet(fillet6_edges, radius=FILLET6_R)

    # Sketch15 → Cut-Extrude7 (cut)
    with BuildSketch(Plane.ZY.offset(32.1056)):
        with Locations((-41.275, 27.94)):
            Circle(SKETCH15_R)
    extrude(amount=-CUT_EXTRUDE7_DEPTH, mode=Mode.SUBTRACT)

    # Sketch17 → Boss-Extrude6 (add)
    with BuildSketch(Plane.ZY.offset(84.455)):
        with BuildLine():
            Line((-150.655, 75.912736962), (-98.171, 75.912736962))
            ThreePointArc((-98.171, 75.912736962), (-104.299654898, 91.920369087), (-115.471784879, 104.91991557))
            ThreePointArc((-115.471784879, 104.91991557), (-120.708410024, 105.664070641), (-123.768126586, 101.349659413))
            ThreePointArc((-123.768126586, 101.349659413), (-132.250831328, 83.387695455), (-150.655, 75.912736962))
        make_face()
    extrude(amount=-BOSS_EXTRUDE6_DEPTH)

    # Fillet9
    fillet9_edges = [part_1.edges().sort_by_distance(p)[0] for p in [
        (-137.455, 20.955, 60.325),
        (137.455, 20.955, 60.325),
    ]]
    fillet(fillet9_edges, radius=FILLET9_R)

    # Sketch18 → Boss-Extrude7 (add)
    with BuildSketch(Plane(origin=(84.455, 0, 0), x_dir=(0, 0, -1), z_dir=(1, 0, 0)).offset(BOSS_EXTRUDE7_START)):
        with BuildLine():
            ThreePointArc((123.768126586, 101.349659413), (132.250831328, 83.387695455), (150.655, 75.912736962))
            Line((150.655, 75.912736962), (98.171, 75.912736962))
            ThreePointArc((98.171, 75.912736962), (104.299654898, 91.920369087), (115.471784879, 104.91991557))
            ThreePointArc((115.471784879, 104.91991557), (120.708410024, 105.664070641), (123.768126586, 101.349659413))
        make_face()
    extrude(amount=BOSS_EXTRUDE7_DEPTH)


solid = part_1.part
